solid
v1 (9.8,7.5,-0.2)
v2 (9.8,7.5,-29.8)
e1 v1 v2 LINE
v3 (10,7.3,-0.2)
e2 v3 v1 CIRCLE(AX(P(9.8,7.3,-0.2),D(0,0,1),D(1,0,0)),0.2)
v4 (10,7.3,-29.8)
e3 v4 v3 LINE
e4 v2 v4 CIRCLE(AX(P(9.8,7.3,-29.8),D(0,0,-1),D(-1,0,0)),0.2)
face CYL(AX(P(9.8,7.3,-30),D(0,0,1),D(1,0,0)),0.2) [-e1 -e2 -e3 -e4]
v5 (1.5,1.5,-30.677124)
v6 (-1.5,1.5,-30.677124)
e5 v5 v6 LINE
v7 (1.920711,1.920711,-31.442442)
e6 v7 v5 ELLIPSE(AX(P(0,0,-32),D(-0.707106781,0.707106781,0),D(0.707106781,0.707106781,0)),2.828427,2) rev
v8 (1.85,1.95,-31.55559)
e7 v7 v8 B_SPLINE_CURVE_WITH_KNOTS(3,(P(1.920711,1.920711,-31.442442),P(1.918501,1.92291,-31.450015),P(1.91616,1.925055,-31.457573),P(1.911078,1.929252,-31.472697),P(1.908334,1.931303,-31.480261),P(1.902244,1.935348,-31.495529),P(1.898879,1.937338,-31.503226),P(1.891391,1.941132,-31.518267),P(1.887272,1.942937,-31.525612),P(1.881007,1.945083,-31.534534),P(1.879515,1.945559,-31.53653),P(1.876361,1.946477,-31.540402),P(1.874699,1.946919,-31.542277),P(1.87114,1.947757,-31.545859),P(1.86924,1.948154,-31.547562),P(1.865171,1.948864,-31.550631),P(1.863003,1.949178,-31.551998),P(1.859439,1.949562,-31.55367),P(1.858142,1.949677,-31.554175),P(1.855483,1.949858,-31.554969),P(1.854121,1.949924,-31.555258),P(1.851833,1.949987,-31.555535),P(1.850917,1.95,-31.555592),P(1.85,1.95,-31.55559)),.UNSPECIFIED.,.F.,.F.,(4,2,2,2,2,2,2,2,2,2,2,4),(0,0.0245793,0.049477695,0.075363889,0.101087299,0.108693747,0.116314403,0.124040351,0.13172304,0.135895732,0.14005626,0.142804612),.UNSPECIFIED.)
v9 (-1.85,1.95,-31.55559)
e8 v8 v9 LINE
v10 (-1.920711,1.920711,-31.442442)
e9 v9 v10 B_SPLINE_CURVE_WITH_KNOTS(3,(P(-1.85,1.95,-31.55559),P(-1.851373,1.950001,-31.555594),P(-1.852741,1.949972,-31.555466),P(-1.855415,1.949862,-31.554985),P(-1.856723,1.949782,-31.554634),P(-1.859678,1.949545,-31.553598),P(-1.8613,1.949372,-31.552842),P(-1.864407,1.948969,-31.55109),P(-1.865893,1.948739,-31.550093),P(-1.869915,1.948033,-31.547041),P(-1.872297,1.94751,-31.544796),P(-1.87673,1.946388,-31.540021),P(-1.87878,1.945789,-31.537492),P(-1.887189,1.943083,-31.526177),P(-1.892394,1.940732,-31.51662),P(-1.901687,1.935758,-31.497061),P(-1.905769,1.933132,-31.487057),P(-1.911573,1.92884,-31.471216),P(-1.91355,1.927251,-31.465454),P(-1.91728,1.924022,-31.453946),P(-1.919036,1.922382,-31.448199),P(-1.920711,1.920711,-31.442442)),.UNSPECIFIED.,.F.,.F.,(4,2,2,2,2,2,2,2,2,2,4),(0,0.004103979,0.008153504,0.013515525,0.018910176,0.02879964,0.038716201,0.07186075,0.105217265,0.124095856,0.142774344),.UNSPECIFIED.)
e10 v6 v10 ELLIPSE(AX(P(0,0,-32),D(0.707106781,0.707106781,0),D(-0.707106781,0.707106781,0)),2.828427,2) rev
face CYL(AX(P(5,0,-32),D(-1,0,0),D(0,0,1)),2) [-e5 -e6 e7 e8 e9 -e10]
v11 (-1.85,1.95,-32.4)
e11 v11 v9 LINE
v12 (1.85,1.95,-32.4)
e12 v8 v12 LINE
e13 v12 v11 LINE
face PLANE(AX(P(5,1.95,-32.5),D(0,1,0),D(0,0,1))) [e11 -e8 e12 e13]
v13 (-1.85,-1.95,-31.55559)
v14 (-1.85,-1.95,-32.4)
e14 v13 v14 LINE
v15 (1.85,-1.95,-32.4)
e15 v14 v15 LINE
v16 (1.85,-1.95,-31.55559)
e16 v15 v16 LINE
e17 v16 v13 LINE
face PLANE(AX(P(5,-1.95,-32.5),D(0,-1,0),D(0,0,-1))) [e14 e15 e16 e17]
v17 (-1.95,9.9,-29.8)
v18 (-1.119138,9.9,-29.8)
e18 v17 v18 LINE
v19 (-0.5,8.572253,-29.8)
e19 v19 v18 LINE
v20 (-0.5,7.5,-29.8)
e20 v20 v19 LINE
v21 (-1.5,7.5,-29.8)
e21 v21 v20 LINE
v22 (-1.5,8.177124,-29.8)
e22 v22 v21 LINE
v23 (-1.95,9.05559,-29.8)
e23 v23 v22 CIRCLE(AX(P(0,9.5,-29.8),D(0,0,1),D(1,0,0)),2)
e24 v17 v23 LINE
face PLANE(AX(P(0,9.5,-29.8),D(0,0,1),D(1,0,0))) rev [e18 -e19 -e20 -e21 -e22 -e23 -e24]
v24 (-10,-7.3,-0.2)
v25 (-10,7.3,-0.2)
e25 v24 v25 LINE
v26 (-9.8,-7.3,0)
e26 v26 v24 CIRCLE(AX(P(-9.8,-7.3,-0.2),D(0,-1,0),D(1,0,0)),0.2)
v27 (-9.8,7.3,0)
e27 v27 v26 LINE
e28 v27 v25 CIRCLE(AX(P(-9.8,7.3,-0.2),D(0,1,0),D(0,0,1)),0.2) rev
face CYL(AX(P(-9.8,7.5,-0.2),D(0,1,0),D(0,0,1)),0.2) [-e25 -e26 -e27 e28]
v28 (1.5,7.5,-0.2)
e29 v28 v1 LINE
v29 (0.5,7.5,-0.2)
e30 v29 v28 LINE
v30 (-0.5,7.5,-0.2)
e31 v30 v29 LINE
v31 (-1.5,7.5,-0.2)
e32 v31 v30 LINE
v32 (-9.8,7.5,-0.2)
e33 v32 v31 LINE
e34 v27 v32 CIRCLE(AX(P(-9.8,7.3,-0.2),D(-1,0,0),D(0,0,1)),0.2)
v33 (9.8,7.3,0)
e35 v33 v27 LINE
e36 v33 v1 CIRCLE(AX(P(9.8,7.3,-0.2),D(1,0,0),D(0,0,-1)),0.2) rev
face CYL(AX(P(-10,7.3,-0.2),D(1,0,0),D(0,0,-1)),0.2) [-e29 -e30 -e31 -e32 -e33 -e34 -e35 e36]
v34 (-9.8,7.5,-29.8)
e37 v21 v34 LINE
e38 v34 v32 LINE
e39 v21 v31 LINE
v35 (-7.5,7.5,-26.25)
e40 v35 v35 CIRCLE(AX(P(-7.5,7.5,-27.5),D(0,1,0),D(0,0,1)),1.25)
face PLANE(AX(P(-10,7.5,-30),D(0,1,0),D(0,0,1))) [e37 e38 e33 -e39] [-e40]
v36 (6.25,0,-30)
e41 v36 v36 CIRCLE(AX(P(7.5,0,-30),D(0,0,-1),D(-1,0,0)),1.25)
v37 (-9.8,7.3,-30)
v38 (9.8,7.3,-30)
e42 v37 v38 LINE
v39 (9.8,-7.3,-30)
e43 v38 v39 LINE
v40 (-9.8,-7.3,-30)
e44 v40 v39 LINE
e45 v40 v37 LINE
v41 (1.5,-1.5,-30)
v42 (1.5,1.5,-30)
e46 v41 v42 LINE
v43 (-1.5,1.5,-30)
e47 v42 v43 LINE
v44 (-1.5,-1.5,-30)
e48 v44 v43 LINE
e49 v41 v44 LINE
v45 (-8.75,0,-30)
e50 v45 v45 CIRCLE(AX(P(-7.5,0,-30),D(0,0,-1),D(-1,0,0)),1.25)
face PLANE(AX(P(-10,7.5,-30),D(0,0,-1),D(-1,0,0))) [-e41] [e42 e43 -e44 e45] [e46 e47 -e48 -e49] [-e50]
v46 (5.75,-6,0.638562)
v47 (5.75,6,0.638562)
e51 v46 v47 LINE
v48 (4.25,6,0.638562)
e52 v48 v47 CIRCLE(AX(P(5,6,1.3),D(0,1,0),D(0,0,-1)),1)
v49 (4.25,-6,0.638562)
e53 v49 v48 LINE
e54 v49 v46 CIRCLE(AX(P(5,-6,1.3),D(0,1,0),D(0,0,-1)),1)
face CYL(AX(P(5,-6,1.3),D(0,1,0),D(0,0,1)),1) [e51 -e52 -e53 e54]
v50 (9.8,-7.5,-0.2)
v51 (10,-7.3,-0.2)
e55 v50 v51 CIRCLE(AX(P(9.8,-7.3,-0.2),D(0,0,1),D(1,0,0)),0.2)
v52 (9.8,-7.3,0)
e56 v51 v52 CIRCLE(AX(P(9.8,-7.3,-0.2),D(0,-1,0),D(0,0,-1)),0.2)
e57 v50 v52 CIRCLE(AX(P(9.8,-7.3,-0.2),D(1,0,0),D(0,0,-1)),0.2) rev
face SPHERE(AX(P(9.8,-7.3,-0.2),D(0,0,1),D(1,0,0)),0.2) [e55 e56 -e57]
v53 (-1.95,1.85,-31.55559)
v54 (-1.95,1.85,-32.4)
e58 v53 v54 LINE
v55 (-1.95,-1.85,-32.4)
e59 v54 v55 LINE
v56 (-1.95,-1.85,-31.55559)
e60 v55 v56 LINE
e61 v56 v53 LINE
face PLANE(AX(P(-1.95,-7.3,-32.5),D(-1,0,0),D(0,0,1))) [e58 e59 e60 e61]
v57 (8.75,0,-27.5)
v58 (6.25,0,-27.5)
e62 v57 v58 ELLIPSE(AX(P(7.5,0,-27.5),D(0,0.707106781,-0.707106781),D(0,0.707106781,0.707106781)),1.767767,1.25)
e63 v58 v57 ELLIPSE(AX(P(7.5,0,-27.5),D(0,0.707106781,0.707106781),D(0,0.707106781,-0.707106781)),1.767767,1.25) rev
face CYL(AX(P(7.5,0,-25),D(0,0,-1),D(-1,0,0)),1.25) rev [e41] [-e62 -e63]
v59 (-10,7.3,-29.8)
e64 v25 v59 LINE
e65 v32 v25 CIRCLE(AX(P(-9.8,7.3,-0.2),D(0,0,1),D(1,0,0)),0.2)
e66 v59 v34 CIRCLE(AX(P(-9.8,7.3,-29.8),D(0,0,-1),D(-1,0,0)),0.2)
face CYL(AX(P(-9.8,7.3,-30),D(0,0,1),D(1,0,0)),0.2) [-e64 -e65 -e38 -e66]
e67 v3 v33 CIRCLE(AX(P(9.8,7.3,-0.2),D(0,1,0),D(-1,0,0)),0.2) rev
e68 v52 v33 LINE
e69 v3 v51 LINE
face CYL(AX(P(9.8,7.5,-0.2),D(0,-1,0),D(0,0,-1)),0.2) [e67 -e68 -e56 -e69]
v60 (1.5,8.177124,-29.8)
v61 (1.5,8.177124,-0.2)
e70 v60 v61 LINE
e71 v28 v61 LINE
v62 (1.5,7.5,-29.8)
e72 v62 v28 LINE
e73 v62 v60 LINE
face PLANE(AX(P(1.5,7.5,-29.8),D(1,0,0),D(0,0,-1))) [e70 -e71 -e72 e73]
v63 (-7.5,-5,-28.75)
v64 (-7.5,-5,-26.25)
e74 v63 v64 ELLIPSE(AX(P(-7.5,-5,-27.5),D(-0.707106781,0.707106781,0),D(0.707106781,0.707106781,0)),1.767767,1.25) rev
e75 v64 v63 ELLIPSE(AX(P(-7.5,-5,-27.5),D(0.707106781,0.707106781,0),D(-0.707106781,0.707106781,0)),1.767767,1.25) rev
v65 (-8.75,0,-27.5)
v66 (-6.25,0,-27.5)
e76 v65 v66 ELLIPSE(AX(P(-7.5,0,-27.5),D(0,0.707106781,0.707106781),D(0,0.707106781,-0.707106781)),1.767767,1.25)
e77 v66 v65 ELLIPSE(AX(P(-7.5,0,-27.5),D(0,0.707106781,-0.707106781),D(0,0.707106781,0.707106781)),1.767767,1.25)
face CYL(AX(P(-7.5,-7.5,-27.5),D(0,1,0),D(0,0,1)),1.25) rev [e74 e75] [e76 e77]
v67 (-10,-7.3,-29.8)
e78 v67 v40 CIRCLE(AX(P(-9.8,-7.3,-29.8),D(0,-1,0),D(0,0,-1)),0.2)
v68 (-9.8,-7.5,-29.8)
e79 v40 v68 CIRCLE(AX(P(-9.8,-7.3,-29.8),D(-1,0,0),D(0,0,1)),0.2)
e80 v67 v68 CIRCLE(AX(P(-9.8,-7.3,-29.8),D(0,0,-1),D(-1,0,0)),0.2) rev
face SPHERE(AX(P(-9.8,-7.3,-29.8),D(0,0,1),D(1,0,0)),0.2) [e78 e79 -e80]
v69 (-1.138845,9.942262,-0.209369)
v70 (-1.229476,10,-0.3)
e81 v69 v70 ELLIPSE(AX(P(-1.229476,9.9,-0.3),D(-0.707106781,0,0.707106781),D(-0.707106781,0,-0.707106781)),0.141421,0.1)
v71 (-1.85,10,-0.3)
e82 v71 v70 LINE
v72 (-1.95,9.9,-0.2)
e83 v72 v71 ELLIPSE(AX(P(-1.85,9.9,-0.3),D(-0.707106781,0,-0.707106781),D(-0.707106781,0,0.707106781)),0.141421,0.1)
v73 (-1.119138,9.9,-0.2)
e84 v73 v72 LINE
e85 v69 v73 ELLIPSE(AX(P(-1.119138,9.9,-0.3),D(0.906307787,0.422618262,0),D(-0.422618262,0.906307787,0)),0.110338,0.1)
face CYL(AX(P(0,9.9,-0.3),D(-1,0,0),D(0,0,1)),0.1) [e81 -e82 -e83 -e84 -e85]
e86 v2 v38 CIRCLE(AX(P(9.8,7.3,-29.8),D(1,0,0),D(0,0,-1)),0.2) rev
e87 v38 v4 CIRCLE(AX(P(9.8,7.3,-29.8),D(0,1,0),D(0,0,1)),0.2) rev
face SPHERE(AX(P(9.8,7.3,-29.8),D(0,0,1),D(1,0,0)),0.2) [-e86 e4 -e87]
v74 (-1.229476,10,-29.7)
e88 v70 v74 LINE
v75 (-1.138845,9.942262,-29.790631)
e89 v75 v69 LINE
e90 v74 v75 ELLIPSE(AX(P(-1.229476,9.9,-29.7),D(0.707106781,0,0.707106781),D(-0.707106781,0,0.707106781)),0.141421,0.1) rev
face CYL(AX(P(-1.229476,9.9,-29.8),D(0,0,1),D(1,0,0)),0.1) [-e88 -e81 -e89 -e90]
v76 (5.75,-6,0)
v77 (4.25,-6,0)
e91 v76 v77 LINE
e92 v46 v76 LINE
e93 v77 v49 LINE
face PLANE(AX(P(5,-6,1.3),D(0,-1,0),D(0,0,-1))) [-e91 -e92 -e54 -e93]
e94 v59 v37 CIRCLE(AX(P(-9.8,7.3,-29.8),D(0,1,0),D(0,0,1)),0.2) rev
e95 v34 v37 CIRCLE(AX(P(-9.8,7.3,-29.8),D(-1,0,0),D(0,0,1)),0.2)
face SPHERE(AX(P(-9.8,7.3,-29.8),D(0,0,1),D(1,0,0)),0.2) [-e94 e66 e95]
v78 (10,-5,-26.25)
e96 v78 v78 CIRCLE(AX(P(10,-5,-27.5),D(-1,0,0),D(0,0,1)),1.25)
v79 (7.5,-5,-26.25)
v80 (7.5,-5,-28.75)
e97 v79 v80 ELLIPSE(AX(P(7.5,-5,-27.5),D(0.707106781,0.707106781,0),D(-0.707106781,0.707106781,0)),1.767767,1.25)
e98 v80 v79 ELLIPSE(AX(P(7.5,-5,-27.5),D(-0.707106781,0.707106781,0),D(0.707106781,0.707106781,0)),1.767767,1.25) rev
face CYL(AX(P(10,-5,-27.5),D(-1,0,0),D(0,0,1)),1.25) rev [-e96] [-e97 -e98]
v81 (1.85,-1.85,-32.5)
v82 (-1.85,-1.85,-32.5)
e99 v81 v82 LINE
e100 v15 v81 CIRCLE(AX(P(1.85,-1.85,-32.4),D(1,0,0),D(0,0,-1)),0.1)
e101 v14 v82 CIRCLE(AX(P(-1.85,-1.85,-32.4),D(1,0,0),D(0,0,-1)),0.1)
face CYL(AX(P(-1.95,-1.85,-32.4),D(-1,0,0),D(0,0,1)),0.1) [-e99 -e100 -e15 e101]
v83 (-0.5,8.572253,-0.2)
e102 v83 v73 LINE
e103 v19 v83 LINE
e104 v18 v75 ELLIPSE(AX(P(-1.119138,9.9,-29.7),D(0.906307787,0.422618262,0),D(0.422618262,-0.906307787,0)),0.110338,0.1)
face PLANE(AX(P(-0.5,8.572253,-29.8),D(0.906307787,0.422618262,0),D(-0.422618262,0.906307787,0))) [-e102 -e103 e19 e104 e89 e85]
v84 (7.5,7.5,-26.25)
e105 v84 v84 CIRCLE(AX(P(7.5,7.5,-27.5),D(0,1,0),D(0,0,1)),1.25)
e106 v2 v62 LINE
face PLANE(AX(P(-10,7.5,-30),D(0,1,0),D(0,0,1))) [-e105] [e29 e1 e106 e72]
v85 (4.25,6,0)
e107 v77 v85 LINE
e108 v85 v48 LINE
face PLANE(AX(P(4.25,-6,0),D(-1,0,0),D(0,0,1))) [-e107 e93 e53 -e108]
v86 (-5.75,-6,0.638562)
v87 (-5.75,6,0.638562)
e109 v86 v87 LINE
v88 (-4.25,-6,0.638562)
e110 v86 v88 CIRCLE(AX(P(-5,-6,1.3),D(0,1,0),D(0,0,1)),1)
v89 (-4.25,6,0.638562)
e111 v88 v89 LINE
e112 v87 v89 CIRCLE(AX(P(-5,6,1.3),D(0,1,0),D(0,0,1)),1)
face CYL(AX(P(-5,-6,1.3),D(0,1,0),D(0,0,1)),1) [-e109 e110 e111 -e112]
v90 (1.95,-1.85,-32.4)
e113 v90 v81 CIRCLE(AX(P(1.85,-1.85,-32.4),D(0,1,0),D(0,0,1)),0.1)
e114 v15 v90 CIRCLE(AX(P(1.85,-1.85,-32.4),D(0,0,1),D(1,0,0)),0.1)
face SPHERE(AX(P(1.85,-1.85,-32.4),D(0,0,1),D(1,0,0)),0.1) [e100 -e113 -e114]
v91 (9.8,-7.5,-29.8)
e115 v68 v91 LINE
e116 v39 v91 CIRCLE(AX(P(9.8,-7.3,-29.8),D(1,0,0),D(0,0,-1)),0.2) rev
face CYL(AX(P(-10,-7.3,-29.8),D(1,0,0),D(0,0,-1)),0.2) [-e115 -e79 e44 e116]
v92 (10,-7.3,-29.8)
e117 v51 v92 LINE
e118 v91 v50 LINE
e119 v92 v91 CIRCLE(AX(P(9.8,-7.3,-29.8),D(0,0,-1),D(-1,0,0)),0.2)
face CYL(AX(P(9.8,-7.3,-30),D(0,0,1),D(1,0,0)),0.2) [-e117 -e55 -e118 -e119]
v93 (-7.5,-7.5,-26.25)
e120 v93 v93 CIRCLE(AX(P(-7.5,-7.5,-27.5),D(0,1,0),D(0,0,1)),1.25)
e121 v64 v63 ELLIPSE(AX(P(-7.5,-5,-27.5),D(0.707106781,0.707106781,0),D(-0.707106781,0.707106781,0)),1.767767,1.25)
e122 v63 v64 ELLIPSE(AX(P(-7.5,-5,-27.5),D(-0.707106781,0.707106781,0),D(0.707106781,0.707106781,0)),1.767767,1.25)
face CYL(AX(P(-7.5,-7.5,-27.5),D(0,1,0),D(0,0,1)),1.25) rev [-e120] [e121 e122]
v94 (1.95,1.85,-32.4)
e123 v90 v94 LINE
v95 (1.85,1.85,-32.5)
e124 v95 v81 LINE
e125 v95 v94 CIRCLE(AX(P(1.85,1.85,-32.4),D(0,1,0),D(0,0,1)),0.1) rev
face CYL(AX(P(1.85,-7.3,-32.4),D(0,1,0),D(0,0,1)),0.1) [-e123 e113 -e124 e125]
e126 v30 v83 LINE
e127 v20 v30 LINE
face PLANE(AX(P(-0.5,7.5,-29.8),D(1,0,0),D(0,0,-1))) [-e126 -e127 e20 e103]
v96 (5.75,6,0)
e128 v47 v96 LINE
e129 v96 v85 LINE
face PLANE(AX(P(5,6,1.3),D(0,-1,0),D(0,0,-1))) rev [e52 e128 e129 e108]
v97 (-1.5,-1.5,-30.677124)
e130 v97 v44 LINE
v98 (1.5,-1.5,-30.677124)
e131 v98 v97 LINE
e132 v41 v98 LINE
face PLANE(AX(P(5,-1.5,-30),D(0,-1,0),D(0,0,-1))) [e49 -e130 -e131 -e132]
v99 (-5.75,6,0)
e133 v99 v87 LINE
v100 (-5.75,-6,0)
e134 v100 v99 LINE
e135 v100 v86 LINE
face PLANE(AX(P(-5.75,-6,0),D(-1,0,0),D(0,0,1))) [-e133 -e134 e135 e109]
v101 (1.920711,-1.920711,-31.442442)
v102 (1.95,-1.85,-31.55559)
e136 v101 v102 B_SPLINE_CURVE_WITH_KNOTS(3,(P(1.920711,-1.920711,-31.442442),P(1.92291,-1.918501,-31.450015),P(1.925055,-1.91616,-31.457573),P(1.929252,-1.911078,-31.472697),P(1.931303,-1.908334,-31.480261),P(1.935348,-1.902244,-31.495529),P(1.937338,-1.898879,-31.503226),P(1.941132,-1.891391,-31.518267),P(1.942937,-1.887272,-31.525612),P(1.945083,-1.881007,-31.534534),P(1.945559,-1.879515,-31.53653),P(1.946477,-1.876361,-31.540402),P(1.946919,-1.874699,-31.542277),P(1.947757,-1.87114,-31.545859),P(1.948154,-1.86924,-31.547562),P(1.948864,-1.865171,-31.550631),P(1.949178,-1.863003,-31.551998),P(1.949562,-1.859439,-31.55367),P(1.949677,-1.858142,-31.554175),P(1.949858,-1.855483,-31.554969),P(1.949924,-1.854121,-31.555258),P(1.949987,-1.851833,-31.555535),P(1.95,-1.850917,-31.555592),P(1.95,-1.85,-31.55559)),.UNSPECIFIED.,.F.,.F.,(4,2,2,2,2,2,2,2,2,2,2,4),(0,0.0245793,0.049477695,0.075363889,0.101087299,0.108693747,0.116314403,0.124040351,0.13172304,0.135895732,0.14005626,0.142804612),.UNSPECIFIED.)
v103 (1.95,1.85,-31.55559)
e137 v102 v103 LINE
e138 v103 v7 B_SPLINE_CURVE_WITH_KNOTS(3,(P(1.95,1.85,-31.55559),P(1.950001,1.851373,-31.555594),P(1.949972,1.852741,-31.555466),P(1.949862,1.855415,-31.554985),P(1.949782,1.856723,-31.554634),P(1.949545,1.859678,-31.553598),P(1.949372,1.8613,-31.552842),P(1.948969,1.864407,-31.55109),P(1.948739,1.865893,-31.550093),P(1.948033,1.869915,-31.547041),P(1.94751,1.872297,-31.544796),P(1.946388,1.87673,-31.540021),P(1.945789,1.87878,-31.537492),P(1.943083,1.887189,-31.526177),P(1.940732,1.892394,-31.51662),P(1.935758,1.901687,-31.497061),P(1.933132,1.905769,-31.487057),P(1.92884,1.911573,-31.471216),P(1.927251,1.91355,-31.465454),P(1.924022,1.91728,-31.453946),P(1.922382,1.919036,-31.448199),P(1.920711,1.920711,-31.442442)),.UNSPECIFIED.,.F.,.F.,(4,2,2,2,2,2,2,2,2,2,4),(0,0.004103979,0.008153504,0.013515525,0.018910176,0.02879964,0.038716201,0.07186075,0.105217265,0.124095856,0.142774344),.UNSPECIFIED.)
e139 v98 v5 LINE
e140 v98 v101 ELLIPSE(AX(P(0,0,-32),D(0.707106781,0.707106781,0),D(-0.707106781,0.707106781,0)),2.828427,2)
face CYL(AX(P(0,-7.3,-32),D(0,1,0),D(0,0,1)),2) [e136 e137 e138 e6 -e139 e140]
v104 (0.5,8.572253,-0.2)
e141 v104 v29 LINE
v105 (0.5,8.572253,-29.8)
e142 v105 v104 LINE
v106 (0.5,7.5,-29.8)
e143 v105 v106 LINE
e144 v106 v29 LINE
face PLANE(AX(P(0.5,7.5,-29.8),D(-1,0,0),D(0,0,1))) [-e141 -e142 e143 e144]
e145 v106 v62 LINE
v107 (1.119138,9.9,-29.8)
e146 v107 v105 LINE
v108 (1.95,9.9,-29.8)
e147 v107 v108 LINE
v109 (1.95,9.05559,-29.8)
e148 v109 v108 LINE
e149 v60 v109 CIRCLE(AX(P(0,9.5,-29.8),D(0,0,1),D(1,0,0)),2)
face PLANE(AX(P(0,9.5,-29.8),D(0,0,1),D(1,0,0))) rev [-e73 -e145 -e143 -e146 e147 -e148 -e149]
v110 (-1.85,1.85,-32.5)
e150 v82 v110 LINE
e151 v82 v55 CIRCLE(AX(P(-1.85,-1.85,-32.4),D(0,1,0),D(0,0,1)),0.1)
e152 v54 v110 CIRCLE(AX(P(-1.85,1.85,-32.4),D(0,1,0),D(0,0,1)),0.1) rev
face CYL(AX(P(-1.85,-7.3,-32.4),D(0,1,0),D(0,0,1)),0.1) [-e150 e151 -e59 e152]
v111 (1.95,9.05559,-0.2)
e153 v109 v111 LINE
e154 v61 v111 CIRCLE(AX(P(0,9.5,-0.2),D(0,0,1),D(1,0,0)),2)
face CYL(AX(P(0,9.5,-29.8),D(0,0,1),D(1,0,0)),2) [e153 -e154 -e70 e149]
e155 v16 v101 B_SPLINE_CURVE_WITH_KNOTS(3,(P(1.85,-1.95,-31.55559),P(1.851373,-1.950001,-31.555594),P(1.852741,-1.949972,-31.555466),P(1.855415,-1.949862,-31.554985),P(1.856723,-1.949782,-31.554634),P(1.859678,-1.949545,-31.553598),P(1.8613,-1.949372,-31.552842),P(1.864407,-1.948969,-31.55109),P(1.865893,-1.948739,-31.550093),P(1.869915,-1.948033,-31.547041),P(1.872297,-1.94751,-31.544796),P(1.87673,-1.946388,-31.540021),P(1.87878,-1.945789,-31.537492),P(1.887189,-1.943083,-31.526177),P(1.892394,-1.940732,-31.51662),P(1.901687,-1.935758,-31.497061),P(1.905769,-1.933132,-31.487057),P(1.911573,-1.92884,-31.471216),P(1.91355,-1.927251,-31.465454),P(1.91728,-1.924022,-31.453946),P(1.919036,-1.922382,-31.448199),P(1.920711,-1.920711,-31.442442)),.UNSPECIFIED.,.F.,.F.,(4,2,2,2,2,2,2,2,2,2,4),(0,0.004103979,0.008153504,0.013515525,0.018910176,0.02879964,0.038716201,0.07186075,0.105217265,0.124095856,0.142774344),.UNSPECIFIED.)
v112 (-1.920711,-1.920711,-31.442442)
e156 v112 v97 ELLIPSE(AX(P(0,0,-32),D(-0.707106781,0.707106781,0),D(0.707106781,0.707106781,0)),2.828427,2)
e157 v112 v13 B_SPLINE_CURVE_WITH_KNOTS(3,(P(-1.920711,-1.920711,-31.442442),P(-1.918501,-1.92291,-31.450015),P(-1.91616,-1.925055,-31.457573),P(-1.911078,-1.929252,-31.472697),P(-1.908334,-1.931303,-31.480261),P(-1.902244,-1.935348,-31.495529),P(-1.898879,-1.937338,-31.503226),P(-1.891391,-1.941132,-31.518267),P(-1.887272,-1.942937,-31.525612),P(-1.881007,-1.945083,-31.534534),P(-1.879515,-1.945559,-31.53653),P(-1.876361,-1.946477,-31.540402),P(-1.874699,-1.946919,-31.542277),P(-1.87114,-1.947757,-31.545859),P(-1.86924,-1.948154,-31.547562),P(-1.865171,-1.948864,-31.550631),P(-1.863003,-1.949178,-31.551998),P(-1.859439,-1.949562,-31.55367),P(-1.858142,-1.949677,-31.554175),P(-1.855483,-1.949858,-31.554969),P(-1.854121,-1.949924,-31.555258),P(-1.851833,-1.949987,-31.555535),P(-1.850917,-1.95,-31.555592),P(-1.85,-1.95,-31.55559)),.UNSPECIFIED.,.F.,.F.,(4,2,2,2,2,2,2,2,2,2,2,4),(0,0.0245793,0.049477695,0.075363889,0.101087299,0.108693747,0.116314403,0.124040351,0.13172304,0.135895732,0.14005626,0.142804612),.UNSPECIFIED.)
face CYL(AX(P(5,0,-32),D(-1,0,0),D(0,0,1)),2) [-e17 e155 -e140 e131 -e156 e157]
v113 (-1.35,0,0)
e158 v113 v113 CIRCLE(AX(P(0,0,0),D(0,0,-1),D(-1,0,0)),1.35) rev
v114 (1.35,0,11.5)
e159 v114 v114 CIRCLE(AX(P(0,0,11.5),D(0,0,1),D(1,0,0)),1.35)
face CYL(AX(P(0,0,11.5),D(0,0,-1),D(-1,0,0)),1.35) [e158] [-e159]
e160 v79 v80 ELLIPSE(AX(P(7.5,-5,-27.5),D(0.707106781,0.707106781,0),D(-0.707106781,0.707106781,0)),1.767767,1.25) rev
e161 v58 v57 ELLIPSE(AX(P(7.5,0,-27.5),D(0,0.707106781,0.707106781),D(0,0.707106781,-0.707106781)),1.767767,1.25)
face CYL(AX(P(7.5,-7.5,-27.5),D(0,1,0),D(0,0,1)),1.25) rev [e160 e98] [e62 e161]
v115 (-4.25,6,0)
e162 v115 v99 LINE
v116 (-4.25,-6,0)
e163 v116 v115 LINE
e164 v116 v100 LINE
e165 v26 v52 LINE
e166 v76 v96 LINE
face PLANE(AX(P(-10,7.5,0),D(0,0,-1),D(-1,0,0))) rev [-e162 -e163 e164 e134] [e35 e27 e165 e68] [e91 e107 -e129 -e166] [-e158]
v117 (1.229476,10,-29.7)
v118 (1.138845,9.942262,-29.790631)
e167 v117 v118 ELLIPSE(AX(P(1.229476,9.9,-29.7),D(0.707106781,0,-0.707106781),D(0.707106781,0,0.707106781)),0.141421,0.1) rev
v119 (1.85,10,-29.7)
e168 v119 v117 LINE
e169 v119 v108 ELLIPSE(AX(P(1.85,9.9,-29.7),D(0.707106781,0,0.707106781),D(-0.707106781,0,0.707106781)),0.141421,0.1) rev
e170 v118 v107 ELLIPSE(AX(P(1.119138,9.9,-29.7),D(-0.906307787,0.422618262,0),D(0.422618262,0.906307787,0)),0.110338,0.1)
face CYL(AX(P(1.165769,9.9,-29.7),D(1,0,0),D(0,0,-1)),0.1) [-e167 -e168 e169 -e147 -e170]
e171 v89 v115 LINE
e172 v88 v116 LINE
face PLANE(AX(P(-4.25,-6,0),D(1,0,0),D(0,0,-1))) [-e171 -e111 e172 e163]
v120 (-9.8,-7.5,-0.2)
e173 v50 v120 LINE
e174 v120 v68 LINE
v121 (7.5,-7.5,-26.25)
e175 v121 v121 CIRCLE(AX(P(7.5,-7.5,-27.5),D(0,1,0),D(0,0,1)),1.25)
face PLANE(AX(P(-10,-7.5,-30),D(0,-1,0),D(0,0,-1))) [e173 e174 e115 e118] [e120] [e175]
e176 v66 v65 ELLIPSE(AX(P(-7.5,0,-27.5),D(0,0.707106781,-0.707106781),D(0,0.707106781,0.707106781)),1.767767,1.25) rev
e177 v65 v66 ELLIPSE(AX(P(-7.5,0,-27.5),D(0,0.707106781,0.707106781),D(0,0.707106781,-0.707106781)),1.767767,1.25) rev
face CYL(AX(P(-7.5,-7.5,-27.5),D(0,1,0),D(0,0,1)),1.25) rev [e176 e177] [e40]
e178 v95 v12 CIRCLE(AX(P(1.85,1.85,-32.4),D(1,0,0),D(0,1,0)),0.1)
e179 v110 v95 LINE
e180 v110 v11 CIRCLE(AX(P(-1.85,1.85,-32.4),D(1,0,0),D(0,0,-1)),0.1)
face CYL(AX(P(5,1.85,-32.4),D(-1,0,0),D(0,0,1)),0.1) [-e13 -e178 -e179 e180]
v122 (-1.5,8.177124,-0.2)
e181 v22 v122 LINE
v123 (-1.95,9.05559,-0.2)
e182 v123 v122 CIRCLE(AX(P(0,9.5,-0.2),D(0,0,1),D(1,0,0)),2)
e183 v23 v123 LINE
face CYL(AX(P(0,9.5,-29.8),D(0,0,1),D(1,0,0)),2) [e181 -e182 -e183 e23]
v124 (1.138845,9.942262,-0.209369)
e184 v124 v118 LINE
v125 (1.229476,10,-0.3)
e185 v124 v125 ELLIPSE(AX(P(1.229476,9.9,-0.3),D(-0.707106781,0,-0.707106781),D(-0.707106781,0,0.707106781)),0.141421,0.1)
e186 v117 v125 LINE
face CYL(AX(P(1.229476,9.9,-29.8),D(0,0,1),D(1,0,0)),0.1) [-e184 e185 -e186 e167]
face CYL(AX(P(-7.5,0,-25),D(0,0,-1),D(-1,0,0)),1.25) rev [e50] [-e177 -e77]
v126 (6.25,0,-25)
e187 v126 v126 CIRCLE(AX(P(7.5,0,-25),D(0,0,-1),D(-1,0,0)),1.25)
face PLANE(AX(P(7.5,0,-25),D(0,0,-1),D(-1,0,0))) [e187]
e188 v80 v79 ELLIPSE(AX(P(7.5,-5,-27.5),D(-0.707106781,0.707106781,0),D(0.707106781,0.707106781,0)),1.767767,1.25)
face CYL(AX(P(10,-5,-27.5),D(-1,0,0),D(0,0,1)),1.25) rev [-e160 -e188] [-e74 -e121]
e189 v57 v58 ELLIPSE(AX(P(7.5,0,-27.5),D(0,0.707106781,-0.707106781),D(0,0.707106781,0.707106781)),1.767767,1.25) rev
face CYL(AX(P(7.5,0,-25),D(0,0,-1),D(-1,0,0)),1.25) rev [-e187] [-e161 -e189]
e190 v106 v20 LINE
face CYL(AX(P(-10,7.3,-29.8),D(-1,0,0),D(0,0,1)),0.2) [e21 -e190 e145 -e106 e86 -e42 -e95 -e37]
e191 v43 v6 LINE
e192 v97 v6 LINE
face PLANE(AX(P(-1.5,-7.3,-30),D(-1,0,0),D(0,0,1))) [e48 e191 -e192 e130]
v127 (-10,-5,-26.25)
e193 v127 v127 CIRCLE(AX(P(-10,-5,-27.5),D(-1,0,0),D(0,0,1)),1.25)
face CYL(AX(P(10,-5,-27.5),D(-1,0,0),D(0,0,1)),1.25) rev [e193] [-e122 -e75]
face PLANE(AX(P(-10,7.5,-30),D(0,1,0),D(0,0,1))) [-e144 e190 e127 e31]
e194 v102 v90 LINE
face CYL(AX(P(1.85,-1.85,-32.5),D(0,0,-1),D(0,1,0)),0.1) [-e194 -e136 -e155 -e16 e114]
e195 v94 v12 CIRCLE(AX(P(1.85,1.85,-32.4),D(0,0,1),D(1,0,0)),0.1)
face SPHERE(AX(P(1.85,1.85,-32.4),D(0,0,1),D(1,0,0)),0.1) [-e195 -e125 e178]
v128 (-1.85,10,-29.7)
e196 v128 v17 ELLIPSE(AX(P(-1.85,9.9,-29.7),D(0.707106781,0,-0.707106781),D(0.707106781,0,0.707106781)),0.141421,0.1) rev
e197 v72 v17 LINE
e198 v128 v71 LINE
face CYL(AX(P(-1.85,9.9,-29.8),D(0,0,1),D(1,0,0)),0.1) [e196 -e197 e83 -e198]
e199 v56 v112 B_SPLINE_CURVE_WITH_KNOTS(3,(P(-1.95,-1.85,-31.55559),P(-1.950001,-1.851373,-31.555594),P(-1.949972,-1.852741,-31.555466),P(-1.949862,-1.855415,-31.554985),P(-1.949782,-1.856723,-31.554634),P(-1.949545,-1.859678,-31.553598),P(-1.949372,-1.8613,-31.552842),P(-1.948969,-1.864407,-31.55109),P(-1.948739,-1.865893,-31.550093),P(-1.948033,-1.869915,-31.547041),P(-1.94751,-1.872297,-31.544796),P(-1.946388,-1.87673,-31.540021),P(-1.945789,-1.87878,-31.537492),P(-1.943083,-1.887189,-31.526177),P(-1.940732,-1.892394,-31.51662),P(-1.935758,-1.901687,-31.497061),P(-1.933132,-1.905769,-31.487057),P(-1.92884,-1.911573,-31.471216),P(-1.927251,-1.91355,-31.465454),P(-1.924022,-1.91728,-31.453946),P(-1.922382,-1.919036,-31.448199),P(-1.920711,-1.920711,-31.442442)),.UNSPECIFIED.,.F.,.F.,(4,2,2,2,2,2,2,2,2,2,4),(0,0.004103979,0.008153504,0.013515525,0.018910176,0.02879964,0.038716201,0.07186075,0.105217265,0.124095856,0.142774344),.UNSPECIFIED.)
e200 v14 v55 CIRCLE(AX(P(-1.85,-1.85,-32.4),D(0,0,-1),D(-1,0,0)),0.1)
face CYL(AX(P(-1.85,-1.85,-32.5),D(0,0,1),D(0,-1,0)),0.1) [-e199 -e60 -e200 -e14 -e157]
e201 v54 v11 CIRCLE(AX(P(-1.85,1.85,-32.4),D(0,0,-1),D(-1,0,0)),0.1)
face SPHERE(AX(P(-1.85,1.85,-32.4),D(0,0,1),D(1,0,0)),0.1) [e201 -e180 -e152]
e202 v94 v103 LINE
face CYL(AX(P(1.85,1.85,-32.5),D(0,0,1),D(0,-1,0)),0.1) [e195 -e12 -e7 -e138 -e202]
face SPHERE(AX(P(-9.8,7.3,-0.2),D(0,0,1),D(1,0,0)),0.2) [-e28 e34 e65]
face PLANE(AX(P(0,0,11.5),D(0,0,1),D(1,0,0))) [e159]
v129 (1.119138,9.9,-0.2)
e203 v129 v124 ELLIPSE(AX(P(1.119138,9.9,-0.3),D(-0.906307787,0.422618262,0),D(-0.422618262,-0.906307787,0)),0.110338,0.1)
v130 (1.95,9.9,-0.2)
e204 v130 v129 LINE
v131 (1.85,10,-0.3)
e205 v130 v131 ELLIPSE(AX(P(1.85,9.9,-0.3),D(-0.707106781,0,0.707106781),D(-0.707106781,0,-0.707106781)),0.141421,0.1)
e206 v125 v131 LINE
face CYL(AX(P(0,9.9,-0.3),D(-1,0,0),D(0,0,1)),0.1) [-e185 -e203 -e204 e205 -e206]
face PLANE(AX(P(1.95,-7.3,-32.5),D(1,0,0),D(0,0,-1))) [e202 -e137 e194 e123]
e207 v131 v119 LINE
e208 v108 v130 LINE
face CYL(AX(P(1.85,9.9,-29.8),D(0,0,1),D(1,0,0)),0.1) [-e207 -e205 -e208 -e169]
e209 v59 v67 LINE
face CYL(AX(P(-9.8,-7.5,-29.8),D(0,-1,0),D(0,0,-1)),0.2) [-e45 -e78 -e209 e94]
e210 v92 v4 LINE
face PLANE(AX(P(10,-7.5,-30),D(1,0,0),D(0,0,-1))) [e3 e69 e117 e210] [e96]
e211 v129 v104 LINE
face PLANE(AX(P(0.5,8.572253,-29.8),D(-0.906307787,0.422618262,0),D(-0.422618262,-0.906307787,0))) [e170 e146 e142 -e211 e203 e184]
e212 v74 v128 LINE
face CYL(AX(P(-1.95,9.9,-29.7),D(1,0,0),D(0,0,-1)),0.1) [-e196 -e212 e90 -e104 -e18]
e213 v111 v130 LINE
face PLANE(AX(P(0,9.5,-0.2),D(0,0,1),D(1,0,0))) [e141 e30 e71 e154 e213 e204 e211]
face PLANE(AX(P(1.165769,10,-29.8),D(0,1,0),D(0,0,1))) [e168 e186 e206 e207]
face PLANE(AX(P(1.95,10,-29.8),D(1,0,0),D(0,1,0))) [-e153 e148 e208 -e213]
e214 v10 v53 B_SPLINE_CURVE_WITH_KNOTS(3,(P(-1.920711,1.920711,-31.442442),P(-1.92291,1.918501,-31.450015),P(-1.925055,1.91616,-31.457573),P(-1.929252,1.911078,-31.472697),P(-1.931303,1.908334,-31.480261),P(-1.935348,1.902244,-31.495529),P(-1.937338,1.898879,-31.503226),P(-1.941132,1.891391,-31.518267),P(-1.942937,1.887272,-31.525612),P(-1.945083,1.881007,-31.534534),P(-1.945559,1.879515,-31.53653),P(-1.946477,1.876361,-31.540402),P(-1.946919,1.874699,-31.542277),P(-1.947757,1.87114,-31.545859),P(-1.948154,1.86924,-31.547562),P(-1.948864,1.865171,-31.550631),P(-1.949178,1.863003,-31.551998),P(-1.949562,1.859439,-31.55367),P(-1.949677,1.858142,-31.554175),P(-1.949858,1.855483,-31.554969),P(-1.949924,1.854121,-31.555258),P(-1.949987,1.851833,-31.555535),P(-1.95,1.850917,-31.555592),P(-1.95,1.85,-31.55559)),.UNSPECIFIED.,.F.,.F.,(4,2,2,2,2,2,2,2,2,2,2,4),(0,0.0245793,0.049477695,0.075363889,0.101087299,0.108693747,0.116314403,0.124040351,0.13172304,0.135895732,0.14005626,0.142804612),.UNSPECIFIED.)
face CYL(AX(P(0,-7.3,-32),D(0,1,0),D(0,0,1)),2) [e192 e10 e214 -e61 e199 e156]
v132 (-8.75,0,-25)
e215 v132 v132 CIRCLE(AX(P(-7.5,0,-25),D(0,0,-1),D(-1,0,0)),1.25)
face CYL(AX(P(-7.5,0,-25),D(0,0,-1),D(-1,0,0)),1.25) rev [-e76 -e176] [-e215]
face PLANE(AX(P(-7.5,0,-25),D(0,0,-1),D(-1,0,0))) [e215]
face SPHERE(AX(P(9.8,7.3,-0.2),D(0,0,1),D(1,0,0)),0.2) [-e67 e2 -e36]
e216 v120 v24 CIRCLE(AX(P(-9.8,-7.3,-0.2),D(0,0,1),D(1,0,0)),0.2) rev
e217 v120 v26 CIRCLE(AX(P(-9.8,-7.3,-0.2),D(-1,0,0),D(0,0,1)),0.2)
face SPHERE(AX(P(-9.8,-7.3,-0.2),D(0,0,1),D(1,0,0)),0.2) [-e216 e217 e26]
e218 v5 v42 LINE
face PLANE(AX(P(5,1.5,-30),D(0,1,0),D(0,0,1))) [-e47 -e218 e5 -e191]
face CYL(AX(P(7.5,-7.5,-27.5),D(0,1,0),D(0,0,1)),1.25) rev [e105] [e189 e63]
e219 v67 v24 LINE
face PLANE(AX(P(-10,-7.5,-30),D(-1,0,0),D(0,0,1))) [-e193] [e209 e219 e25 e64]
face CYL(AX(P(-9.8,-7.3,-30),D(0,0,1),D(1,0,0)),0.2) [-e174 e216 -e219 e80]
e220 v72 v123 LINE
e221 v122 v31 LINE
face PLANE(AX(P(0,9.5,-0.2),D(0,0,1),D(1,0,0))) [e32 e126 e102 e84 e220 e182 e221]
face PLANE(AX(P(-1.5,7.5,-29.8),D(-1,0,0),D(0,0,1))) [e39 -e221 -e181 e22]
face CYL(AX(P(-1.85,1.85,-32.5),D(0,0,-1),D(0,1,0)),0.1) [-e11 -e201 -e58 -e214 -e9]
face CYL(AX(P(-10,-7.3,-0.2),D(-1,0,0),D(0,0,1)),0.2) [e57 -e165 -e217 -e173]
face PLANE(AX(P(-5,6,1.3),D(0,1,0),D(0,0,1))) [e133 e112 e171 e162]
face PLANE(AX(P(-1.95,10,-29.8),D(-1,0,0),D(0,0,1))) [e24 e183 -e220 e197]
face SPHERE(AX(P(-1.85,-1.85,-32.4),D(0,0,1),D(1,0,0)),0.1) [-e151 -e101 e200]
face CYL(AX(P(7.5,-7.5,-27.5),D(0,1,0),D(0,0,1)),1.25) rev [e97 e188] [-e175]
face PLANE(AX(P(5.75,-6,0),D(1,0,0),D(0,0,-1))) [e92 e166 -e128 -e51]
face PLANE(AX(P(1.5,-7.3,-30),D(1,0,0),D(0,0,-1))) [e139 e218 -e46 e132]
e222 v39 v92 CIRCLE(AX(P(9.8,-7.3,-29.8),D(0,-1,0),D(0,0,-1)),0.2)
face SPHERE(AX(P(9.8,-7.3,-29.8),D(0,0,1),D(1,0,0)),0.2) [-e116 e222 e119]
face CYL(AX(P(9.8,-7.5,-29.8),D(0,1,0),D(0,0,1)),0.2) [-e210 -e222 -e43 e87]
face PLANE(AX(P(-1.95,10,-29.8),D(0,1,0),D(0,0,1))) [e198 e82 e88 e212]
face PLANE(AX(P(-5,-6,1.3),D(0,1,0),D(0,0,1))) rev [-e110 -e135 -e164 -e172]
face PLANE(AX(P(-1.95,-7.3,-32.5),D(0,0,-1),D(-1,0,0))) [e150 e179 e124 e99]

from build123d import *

# Parameters (mm, degrees)
SKETCH_1_W               = 20
SKETCH_1_H               = 15
EXTRUDE_1_DEPTH          = 30
EXTRUDE_2_DEPTH          = 6
EXTRUDE_2_DEPTH_BACK     = 6
SKETCH_3_R               = 1.35
EXTRUDE_3_DEPTH          = 11.5
EXTRUDE_START            = -0.2
EXTRUDE_4_DEPTH          = 29.6
EXTRUDE_5_DEPTH          = 14.6
FILLET_1_R               = 0.1
FILLET_2_R               = 0.2
SKETCH_6_R               = 1.25
CUT_EXTRUDE_1_DEPTH      = 38.165171868
SKETCH_7_R               = 1.25
CUT_EXTRUDE_2_DEPTH      = 40.449334595
SKETCH_8_R               = 1.25
CUT_EXTRUDE_3_DEPTH      = 5
CUT_EXTRUDE_4_DEPTH      = 5
CUT_EXTRUDE_4_DEPTH_BACK = 5
FILLET_3_R               = 0.1


with BuildPart() as part:
    # 草图1 → 凸台-拉伸1 (new body)
    with BuildSketch(Plane.XY):
        Rectangle(SKETCH_1_W, SKETCH_1_H)
    extrude(amount=-EXTRUDE_1_DEPTH)

    # 草图2 → 凸台-拉伸2 (add, two sides: drawn at the far end of the back side and taken through both)
    with BuildSketch(Plane(origin=(0, 0, 0), x_dir=(1, 0, 0), z_dir=(0, 1, 0)).offset(-EXTRUDE_2_DEPTH_BACK)):
        with BuildLine():
            Line((-4.25, 0), (-5.75, 0))
            Line((-5.75, 0), (-5.75, -0.638562172))
            ThreePointArc((-5.75, -0.638562172), (-5, -2.3), (-4.25, -0.638562172))
            Line((-4.25, -0.638562172), (-4.25, 0))
        make_face()
        with BuildLine():
            Line((4.25, 0), (4.25, -0.638562172))
            ThreePointArc((4.25, -0.638562172), (5, -2.3), (5.75, -0.638562172))
            Line((5.75, -0.638562172), (5.75, 0))
            Line((5.75, 0), (4.25, 0))
        make_face()
    extrude(amount=EXTRUDE_2_DEPTH + EXTRUDE_2_DEPTH_BACK)

    # 草图3 → 凸台-拉伸3 (add)
    with BuildSketch(Plane.XY):
        with Locations(Location((0, 0, 0), (0, 0, 180))):
            Circle(SKETCH_3_R)
    extrude(amount=EXTRUDE_3_DEPTH)

    # 草图4 → 凸台-拉伸4 (add)
    with BuildSketch(Plane.XY.offset(EXTRUDE_START)):
        with BuildLine():
            Line((-1.5, 7.5), (-1.5, 8.177124344))
            ThreePointArc((-1.5, 8.177124344), (-1.780042303, 8.588161527), (-1.95, 9.055590279))
            Line((-1.95, 9.055590279), (-1.95, 10))
            Line((-1.95, 10), (-1.165769145, 10))
            Line((-1.165769145, 10), (-0.5, 8.57225346))
            Line((-0.5, 8.57225346), (-0.5, 7.5))
            Line((-0.5, 7.5), (-1.5, 7.5))
        make_face()
        with BuildLine():
            Line((1.5, 7.5), (1.5, 8.177124344))
            ThreePointArc((1.5, 8.177124344), (1.780042303, 8.588161527), (1.95, 9.055590279))
            Line((1.95, 9.055590279), (1.95, 10))
            Line((1.95, 10), (1.165769145, 10))
            Line((1.165769145, 10), (0.5, 8.57225346))
            Line((0.5, 8.57225346), (0.5, 7.5))
            Line((0.5, 7.5), (1.5, 7.5))
        make_face()
    extrude(amount=-EXTRUDE_4_DEPTH)

    # 草图5 → 凸台-拉伸5 (add)
    with BuildSketch(Plane(origin=(0, 7.5, 0), x_dir=(-1, 0, 0), z_dir=(0, 1, 0)).offset(EXTRUDE_START)):
        with BuildLine():
            Line((1.5, -30), (1.5, -30.677124344))
            ThreePointArc((1.5, -30.677124344), (1.780042303, -31.088161527), (1.95, -31.555590279))
            Line((1.95, -31.555590279), (1.95, -32.5))
            Line((1.95, -32.5), (1.165769145, -32.5))
            Line((1.165769145, -32.5), (-1.165769145, -32.5))
            Line((-1.165769145, -32.5), (-1.95, -32.5))
            Line((-1.95, -32.5), (-1.95, -31.555590279))
            ThreePointArc((-1.95, -31.555590279), (-1.780042303, -31.088161527), (-1.5, -30.677124344))
            Line((-1.5, -30.677124344), (-1.5, -30))
            Line((-1.5, -30), (-0.5, -30))
            Line((-0.5, -30), (0.5, -30))
            Line((0.5, -30), (1.5, -30))
        make_face()
    extrude(amount=-EXTRUDE_5_DEPTH)

    # 圆角1
    fillet_1_edges = [part.edges().sort_by_distance(p)[0] for p in [
        (-1.557884573, 10, -29.8),
        (-1.95, 10, -15),
        (-1.165769145, 10, -15),
        (-1.557884573, 10, -0.2),
        (1.557884573, 10, -29.8),
        (1.165769145, 10, -15),
        (1.95, 10, -15),
        (1.557884573, 10, -0.2),
        (1.95, 0, -32.5),
        (0, -7.3, -32.5),
        (-1.95, 0, -32.5),
        (0, 7.3, -32.5),
    ]]
    fillet(fillet_1_edges, radius=FILLET_1_R)

    # 圆角2
    fillet_2_edges = [part.edges().sort_by_distance(p)[0] for p in [
        (10, 0, -30),
        (0, 7.5, -30),
        (-10, 0, -30),
        (0, 7.5, 0),
        (10, 0, 0),
        (0, -7.5, 0),
        (-10, 0, 0),
        (0, -7.5, -30),
        (-10, 7.5, -15),
        (10, 7.5, -15),
        (10, -7.5, -15),
        (-10, -7.5, -15),
    ]]
    fillet(fillet_2_edges, radius=FILLET_2_R - 0.0001)  # a hair under: the kernel refuses the full size

    # 草图6 → 切除-拉伸1 (cut, through all)
    with BuildSketch(Plane(origin=(0, 7.5, 0), x_dir=(-1, 0, 0), z_dir=(0, 1, 0))):
        with Locations(Location((7.5, -27.5, 0), (0, 0, 90))):
            Circle(SKETCH_6_R)
        with Locations(Location((-7.5, -27.5, 0), (0, 0, 90))):
            Circle(SKETCH_6_R)
    extrude(amount=-CUT_EXTRUDE_1_DEPTH, mode=Mode.SUBTRACT)

    # 草图7 → 切除-拉伸2 (cut, through all)
    with BuildSketch(Plane.ZY.offset(10)):
        with Locations((-27.5, -5)):
            Circle(SKETCH_7_R)
    extrude(amount=-CUT_EXTRUDE_2_DEPTH, mode=Mode.SUBTRACT)

    # 草图8 → 切除-拉伸3 (cut)
    with BuildSketch(Plane(origin=(0, 0, -30), x_dir=(-1, 0, 0), z_dir=(0, 0, -1))):
        with Locations((-7.5, 0)):
            Circle(SKETCH_8_R)
        with Locations((7.5, 0)):
            Circle(SKETCH_8_R)
    extrude(amount=-CUT_EXTRUDE_3_DEPTH, mode=Mode.SUBTRACT)

    # 草图9 → 切除-拉伸4 (cut, two sides: drawn at the far end of the back side and taken through both)
    with BuildSketch(Plane(origin=(0, 0, 0), x_dir=(0, 0, -1), z_dir=(1, 0, 0)).offset(-CUT_EXTRUDE_4_DEPTH_BACK)):
        with BuildLine():
            Line((32.5, 1.95), (31.555590279, 1.95))
            ThreePointArc((31.555590279, 1.95), (31.088161527, 1.780042303), (30.677124344, 1.5))
            Line((30.677124344, 1.5), (30, 1.5))
            Line((30, 1.5), (30, 7.95))
            Line((30, 7.95), (32.5, 7.95))
            Line((32.5, 7.95), (32.5, 1.95))
        make_face()
        with BuildLine():
            Line((30, -1.5), (30.677124344, -1.5))
            ThreePointArc((30.677124344, -1.5), (31.088161527, -1.780042303), (31.555590279, -1.95))
            Line((31.555590279, -1.95), (32.5, -1.95))
            Line((32.5, -1.95), (32.5, -7.95))
            Line((32.5, -7.95), (30, -7.95))
            Line((30, -7.95), (30, -1.5))
        make_face()
    extrude(amount=CUT_EXTRUDE_4_DEPTH + CUT_EXTRUDE_4_DEPTH_BACK, mode=Mode.SUBTRACT)

    # 圆角3
    fillet_3_edges = [part.edges().sort_by_distance(p)[0] for p in [
        (1.95, 1.95, -31.97779514),
        (1.920710678, 1.95, -32.470710678),
        (-1.95, 1.95, -31.97779514),
        (-1.920710678, 1.95, -32.470710678),
        (1.95, -1.95, -31.97779514),
        (1.920710678, -1.95, -32.470710678),
        (-1.95, -1.95, -31.97779514),
        (-1.920710678, -1.95, -32.470710678),
        (0, 1.95, -32.5),
        (0, -1.95, -32.5),
    ]]
    fillet(fillet_3_edges, radius=FILLET_3_R)


solid = part.part
